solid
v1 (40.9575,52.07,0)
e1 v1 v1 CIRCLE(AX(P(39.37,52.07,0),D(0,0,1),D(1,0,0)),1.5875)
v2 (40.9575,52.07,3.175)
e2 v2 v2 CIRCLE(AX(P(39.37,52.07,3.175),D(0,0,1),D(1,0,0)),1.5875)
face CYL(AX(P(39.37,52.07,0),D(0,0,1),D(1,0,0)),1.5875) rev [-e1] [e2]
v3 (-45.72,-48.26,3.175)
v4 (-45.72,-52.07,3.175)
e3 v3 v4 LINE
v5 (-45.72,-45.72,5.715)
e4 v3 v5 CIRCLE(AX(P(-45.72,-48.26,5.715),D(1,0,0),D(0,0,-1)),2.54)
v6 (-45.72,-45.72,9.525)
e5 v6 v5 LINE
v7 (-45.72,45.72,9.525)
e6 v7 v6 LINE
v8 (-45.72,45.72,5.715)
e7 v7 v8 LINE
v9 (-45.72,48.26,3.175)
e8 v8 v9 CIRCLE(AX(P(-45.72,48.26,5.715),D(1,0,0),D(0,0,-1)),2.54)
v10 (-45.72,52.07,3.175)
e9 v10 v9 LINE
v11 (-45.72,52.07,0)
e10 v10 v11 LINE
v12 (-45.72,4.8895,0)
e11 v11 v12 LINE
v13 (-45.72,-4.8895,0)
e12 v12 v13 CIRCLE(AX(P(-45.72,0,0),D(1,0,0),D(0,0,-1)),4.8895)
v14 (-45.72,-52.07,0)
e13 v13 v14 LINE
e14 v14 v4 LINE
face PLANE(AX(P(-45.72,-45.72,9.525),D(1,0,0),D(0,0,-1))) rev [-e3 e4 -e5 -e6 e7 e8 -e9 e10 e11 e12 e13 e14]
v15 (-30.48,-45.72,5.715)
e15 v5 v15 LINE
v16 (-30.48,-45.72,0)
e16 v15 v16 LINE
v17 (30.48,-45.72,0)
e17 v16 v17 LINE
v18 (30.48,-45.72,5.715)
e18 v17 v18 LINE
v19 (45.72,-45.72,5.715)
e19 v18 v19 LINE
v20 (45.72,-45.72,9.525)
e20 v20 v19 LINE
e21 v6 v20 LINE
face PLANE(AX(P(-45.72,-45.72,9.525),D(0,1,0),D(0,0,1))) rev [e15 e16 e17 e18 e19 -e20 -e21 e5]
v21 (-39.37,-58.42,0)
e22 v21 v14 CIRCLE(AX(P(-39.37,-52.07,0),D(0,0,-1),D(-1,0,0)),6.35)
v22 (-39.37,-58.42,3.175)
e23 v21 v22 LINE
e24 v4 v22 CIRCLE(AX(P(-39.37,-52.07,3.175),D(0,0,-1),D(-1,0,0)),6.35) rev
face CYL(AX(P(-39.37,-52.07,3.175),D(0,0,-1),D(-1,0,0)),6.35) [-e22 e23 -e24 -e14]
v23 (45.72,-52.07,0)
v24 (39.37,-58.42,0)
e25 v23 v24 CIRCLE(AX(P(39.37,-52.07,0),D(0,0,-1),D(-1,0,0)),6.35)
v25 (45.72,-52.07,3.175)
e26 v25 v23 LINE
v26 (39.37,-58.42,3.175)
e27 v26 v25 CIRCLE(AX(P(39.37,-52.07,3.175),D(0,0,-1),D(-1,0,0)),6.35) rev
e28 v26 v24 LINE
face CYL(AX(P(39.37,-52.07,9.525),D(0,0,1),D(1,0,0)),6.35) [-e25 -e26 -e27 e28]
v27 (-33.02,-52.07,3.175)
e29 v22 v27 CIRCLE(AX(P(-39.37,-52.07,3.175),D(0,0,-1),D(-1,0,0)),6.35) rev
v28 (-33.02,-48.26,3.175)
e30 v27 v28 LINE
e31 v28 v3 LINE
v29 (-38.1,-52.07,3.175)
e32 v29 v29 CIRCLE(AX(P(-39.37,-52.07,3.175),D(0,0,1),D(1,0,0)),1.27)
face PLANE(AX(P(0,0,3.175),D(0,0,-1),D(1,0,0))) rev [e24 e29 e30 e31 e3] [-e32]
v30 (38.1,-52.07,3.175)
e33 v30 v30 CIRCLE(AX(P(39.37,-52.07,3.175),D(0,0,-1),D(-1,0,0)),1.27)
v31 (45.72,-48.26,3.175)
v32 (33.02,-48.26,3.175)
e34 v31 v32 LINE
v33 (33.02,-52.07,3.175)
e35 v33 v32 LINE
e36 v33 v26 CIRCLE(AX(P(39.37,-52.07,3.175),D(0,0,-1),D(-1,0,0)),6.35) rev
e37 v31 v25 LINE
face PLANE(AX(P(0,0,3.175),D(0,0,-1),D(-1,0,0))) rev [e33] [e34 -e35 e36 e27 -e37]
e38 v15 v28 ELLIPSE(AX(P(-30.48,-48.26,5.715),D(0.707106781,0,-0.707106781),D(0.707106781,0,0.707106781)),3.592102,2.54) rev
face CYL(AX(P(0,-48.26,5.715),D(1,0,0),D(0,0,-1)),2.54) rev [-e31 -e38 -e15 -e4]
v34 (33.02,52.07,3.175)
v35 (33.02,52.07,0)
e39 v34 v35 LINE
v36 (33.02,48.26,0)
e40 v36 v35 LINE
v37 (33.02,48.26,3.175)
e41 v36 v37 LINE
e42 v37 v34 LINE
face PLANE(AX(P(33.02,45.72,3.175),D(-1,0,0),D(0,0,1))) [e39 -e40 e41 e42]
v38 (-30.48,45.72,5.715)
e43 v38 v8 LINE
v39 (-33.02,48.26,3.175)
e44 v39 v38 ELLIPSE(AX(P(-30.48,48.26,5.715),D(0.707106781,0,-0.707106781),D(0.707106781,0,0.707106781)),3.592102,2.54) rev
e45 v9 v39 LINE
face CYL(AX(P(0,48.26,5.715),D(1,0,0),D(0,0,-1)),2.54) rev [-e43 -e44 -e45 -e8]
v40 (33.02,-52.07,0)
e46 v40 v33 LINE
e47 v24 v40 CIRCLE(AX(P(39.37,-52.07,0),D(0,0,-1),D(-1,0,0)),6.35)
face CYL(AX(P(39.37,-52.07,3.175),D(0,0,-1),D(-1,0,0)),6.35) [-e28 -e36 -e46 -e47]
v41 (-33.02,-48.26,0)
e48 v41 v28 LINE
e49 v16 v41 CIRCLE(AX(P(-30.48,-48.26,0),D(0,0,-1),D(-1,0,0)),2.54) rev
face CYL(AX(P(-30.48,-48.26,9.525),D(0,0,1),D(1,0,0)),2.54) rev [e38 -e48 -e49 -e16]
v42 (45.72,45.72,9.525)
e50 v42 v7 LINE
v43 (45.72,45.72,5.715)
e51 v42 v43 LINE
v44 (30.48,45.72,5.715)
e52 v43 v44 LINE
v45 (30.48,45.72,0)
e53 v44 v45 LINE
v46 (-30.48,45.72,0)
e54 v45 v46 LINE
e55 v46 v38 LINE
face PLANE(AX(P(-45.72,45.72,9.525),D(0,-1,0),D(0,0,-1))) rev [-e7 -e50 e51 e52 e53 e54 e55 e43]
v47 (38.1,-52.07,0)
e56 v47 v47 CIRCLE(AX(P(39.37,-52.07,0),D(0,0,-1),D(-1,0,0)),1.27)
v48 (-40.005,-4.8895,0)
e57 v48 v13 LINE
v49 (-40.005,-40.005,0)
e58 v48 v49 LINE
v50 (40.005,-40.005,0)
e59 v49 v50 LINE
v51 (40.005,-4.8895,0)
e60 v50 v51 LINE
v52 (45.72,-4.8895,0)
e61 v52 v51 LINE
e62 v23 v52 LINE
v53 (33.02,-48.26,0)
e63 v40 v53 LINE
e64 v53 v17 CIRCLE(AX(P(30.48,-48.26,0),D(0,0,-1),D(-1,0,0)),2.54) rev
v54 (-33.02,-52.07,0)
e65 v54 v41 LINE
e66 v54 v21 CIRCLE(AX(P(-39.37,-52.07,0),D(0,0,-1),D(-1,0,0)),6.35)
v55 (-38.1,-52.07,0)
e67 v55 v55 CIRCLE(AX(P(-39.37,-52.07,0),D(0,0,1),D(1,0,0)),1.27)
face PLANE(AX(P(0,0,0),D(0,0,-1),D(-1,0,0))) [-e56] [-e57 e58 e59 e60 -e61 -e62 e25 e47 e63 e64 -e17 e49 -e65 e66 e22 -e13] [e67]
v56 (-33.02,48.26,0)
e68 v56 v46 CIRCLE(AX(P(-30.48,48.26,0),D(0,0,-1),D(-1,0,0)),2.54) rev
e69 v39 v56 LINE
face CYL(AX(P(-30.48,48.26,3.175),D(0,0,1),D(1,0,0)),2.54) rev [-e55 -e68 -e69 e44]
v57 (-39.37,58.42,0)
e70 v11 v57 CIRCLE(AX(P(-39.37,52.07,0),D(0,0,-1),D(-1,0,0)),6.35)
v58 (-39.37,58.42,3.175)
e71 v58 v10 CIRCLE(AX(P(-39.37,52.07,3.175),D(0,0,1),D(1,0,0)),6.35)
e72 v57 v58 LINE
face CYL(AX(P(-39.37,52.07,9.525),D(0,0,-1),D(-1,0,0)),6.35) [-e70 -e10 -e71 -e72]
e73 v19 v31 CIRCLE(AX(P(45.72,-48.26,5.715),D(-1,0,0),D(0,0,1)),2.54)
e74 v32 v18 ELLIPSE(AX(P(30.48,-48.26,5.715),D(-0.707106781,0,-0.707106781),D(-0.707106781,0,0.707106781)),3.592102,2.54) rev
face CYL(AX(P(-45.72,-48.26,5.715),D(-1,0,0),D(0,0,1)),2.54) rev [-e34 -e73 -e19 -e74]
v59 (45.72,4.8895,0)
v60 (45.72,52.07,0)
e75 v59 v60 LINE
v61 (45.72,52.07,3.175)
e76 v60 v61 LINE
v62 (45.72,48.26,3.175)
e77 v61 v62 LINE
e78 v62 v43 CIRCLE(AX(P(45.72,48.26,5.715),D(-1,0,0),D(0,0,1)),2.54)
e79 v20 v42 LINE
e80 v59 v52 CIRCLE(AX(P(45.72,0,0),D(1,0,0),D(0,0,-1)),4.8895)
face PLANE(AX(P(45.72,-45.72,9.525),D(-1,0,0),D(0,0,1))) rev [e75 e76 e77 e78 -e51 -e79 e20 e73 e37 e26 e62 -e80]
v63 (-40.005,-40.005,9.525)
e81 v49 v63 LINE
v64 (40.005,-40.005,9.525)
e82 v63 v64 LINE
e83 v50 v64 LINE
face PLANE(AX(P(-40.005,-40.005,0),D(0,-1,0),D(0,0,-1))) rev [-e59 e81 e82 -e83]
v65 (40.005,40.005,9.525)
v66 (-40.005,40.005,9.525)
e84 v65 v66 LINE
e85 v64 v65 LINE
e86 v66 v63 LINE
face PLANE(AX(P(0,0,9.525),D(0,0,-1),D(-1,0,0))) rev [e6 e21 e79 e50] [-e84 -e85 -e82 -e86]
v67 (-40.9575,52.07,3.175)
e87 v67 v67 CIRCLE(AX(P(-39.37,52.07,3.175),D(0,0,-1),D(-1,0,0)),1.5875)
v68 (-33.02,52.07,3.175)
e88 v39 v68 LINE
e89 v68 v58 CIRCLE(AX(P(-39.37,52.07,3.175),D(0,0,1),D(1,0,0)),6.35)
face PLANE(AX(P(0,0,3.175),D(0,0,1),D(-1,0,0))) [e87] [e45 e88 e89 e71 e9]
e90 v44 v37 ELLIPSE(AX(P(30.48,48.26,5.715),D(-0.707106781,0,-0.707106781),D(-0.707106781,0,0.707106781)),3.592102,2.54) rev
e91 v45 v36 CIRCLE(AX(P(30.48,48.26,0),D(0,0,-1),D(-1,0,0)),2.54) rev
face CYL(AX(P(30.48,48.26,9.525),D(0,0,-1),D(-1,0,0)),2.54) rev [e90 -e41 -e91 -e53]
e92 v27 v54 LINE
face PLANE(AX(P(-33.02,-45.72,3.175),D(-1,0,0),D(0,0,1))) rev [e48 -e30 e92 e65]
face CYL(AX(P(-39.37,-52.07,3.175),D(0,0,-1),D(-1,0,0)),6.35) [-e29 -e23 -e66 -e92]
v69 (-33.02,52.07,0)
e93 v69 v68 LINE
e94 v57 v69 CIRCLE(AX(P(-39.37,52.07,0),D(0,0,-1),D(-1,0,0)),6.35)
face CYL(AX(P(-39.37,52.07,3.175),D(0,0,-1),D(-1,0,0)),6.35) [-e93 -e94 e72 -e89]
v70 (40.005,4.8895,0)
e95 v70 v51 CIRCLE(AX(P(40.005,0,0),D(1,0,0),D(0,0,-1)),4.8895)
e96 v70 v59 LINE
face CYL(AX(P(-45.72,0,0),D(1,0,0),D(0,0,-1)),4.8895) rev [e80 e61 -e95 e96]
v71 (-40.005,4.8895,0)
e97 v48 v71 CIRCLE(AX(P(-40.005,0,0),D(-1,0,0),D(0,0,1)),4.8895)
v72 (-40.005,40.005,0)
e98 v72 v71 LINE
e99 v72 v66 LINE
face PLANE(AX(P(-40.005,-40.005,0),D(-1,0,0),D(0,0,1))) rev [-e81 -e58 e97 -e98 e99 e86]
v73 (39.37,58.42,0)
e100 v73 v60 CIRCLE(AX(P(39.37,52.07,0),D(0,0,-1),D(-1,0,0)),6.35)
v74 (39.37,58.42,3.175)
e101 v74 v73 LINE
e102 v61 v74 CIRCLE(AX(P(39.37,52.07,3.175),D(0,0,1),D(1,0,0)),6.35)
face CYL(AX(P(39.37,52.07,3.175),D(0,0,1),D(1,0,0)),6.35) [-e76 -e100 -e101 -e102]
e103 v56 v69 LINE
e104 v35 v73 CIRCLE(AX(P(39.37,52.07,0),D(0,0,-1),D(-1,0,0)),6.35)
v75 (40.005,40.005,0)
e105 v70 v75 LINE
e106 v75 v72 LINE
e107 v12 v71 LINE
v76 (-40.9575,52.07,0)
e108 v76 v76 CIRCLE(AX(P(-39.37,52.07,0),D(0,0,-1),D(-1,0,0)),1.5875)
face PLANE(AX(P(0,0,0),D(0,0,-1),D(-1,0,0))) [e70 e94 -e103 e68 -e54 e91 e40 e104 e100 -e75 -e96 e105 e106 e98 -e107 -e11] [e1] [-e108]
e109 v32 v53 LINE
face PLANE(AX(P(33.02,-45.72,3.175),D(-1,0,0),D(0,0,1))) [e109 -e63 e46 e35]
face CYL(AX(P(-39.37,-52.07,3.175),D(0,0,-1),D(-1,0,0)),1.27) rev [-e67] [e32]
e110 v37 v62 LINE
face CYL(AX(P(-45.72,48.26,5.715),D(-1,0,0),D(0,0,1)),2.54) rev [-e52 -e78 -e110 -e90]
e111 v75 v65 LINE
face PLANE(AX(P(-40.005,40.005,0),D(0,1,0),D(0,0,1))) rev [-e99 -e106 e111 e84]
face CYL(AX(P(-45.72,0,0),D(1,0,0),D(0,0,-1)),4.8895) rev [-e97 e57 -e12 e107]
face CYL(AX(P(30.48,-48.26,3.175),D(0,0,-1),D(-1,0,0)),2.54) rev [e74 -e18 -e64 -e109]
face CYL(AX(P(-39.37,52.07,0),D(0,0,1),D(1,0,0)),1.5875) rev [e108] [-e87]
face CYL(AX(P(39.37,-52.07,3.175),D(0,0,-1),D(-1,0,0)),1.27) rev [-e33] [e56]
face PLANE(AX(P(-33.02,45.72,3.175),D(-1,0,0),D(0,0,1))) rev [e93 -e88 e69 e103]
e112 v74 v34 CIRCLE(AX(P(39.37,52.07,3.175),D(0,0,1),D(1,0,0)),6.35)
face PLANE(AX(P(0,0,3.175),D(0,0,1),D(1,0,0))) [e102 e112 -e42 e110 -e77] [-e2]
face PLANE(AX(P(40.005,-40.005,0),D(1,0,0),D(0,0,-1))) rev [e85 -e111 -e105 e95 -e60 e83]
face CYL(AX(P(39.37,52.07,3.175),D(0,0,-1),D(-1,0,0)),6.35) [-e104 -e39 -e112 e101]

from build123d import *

# Parameters (mm, degrees)
SKETCH1_W            = 91.44
SKETCH1_H            = 91.44
BOSS_EXTRUDE1_DEPTH  = 9.525
SKETCH2_W            = 80.01
SKETCH2_H            = 80.01
CUT_EXTRUDE1_DEPTH   = 9.525
SKETCH3_R            = 4.8895
CUT_EXTRUDE2_DEPTH   = 103.675788894
SKETCH4_W            = 12.7
SKETCH4_H            = 12.7
BOSS_EXTRUDE2_DEPTH  = 3.175
SKETCH5_R            = 1.5875
CUT_EXTRUDE3_DEPTH   = 75.454934692
FILLET1_R            = 6.35
FILLET2_R            = 2.54
FILLET1_OF_MIRROR1_R = 6.35
FILLET2_OF_MIRROR1_R = 2.54
SKETCH6_W            = 12.7
SKETCH6_H            = 12.7
SKETCH6_R            = 1.27
BOSS_EXTRUDE3_DEPTH  = 3.175
FILLET3_R            = 2.54
FILLET4_R            = 6.35
FILLET3_OF_MIRROR7_R = 2.54
FILLET4_OF_MIRROR7_R = 6.35


with BuildPart() as part:
    # Sketch1 → Boss-Extrude1 (new body)
    with BuildSketch(Plane.XY):
        Rectangle(SKETCH1_W, SKETCH1_H)
    extrude(amount=BOSS_EXTRUDE1_DEPTH)

    # Sketch2 → Cut-Extrude1 (cut)
    with BuildSketch(Plane.XY.offset(9.525)):
        Rectangle(SKETCH2_W, SKETCH2_H)
    extrude(amount=-CUT_EXTRUDE1_DEPTH, mode=Mode.SUBTRACT)

    # Sketch3 → Cut-Extrude2 (cut, through all)
    with BuildSketch(Plane(origin=(45.72, 0, 0), x_dir=(0, 0, -1), z_dir=(1, 0, 0))):
        Circle(SKETCH3_R)
        with Locations((0, 57.404)):
            Circle(SKETCH3_R)
        with Locations((0, -57.404)):
            Circle(SKETCH3_R)
    extrude(amount=-CUT_EXTRUDE2_DEPTH, mode=Mode.SUBTRACT)

    # Sketch4 → Boss-Extrude2 (add)
    with BuildSketch(Plane(origin=(0, 0, 0), x_dir=(-1, 0, 0), z_dir=(0, 0, -1))):
        with Locations((-39.37, 52.07)):
            Rectangle(SKETCH4_W, SKETCH4_H)
    boss_extrude2 = extrude(amount=-BOSS_EXTRUDE2_DEPTH)

    # Sketch5 → Cut-Extrude3 (cut, through all)
    with BuildSketch(Plane.XY.offset(3.175)):
        with Locations((39.37, 52.07)):
            Circle(SKETCH5_R)
    cut_extrude3 = extrude(amount=-CUT_EXTRUDE3_DEPTH, mode=Mode.SUBTRACT)

    # Fillet1
    fillet1_edges = [part.edges().sort_by_distance(p)[0] for p in [
        (33.02, 58.42, 1.5875),
        (45.72, 58.42, 1.5875),
    ]]
    fillet(fillet1_edges, radius=FILLET1_R - 0.0001)  # a hair under: the kernel refuses the full size

    # Fillet2
    fillet2_edges = [part.edges().sort_by_distance(p)[0] for p in [
        (39.37, 45.72, 3.175),
        (33.02, 45.72, 1.5875),
    ]]
    fillet(fillet2_edges, radius=FILLET2_R)

    # Mirror1: Boss-Extrude2, Cut-Extrude3 across plane
    add(boss_extrude2.mirror(Plane(origin=(0, 0, 0), x_dir=(0, 0, 1), z_dir=(1, 0, 0))))
    add(cut_extrude3.mirror(Plane(origin=(0, 0, 0), x_dir=(0, 0, 1), z_dir=(1, 0, 0))), mode=Mode.SUBTRACT)

    # Fillet1 of Mirror1
    fillet1_of_mirror1_edges = [part.edges().sort_by_distance(p)[0] for p in [
        (-33.02, 58.42, 1.5875),
        (-45.72, 58.42, 1.5875),
    ]]
    fillet(fillet1_of_mirror1_edges, radius=FILLET1_OF_MIRROR1_R - 0.0001)  # a hair under: the kernel refuses the full size

    # Fillet2 of Mirror1
    fillet2_of_mirror1_edges = [part.edges().sort_by_distance(p)[0] for p in [
        (-39.37, 45.72, 3.175),
        (-33.02, 45.72, 1.5875),
    ]]
    fillet(fillet2_of_mirror1_edges, radius=FILLET2_OF_MIRROR1_R)

    # Sketch6 → Boss-Extrude3 (add)
    with BuildSketch(Plane(origin=(0, 0, 0), x_dir=(-1, 0, 0), z_dir=(0, 0, -1))):
        with Locations((-39.37, -52.07)):
            Rectangle(SKETCH6_W, SKETCH6_H)
        with Locations((-39.37, -52.07)):
            Circle(SKETCH6_R, mode=Mode.SUBTRACT)
    boss_extrude3 = extrude(amount=-BOSS_EXTRUDE3_DEPTH)

    # Fillet3
    fillet3_edges = [part.edges().sort_by_distance(p)[0] for p in [
        (39.37, -45.72, 3.175),
        (33.02, -45.72, 1.5875),
    ]]
    fillet(fillet3_edges, radius=FILLET3_R)

    # Fillet4
    fillet4_edges = [part.edges().sort_by_distance(p)[0] for p in [
        (45.72, -58.42, 1.5875),
        (33.02, -58.42, 1.5875),
    ]]
    fillet(fillet4_edges, radius=FILLET4_R - 0.0001)  # a hair under: the kernel refuses the full size

    # Mirror7: Boss-Extrude3 across plane
    add(boss_extrude3.mirror(Plane(origin=(0, 0, 0), x_dir=(0, 0, 1), z_dir=(1, 0, 0))))

    # Fillet3 of Mirror7
    fillet3_of_mirror7_edges = [part.edges().sort_by_distance(p)[0] for p in [
        (-39.37, -45.72, 3.175),
        (-33.02, -45.72, 1.5875),
    ]]
    fillet(fillet3_of_mirror7_edges, radius=FILLET3_OF_MIRROR7_R)

    # Fillet4 of Mirror7
    fillet4_of_mirror7_edges = [part.edges().sort_by_distance(p)[0] for p in [
        (-45.72, -58.42, 1.5875),
        (-33.02, -58.42, 1.5875),
    ]]
    fillet(fillet4_of_mirror7_edges, radius=FILLET4_OF_MIRROR7_R - 0.0001)  # a hair under: the kernel refuses the full size


solid = part.part
